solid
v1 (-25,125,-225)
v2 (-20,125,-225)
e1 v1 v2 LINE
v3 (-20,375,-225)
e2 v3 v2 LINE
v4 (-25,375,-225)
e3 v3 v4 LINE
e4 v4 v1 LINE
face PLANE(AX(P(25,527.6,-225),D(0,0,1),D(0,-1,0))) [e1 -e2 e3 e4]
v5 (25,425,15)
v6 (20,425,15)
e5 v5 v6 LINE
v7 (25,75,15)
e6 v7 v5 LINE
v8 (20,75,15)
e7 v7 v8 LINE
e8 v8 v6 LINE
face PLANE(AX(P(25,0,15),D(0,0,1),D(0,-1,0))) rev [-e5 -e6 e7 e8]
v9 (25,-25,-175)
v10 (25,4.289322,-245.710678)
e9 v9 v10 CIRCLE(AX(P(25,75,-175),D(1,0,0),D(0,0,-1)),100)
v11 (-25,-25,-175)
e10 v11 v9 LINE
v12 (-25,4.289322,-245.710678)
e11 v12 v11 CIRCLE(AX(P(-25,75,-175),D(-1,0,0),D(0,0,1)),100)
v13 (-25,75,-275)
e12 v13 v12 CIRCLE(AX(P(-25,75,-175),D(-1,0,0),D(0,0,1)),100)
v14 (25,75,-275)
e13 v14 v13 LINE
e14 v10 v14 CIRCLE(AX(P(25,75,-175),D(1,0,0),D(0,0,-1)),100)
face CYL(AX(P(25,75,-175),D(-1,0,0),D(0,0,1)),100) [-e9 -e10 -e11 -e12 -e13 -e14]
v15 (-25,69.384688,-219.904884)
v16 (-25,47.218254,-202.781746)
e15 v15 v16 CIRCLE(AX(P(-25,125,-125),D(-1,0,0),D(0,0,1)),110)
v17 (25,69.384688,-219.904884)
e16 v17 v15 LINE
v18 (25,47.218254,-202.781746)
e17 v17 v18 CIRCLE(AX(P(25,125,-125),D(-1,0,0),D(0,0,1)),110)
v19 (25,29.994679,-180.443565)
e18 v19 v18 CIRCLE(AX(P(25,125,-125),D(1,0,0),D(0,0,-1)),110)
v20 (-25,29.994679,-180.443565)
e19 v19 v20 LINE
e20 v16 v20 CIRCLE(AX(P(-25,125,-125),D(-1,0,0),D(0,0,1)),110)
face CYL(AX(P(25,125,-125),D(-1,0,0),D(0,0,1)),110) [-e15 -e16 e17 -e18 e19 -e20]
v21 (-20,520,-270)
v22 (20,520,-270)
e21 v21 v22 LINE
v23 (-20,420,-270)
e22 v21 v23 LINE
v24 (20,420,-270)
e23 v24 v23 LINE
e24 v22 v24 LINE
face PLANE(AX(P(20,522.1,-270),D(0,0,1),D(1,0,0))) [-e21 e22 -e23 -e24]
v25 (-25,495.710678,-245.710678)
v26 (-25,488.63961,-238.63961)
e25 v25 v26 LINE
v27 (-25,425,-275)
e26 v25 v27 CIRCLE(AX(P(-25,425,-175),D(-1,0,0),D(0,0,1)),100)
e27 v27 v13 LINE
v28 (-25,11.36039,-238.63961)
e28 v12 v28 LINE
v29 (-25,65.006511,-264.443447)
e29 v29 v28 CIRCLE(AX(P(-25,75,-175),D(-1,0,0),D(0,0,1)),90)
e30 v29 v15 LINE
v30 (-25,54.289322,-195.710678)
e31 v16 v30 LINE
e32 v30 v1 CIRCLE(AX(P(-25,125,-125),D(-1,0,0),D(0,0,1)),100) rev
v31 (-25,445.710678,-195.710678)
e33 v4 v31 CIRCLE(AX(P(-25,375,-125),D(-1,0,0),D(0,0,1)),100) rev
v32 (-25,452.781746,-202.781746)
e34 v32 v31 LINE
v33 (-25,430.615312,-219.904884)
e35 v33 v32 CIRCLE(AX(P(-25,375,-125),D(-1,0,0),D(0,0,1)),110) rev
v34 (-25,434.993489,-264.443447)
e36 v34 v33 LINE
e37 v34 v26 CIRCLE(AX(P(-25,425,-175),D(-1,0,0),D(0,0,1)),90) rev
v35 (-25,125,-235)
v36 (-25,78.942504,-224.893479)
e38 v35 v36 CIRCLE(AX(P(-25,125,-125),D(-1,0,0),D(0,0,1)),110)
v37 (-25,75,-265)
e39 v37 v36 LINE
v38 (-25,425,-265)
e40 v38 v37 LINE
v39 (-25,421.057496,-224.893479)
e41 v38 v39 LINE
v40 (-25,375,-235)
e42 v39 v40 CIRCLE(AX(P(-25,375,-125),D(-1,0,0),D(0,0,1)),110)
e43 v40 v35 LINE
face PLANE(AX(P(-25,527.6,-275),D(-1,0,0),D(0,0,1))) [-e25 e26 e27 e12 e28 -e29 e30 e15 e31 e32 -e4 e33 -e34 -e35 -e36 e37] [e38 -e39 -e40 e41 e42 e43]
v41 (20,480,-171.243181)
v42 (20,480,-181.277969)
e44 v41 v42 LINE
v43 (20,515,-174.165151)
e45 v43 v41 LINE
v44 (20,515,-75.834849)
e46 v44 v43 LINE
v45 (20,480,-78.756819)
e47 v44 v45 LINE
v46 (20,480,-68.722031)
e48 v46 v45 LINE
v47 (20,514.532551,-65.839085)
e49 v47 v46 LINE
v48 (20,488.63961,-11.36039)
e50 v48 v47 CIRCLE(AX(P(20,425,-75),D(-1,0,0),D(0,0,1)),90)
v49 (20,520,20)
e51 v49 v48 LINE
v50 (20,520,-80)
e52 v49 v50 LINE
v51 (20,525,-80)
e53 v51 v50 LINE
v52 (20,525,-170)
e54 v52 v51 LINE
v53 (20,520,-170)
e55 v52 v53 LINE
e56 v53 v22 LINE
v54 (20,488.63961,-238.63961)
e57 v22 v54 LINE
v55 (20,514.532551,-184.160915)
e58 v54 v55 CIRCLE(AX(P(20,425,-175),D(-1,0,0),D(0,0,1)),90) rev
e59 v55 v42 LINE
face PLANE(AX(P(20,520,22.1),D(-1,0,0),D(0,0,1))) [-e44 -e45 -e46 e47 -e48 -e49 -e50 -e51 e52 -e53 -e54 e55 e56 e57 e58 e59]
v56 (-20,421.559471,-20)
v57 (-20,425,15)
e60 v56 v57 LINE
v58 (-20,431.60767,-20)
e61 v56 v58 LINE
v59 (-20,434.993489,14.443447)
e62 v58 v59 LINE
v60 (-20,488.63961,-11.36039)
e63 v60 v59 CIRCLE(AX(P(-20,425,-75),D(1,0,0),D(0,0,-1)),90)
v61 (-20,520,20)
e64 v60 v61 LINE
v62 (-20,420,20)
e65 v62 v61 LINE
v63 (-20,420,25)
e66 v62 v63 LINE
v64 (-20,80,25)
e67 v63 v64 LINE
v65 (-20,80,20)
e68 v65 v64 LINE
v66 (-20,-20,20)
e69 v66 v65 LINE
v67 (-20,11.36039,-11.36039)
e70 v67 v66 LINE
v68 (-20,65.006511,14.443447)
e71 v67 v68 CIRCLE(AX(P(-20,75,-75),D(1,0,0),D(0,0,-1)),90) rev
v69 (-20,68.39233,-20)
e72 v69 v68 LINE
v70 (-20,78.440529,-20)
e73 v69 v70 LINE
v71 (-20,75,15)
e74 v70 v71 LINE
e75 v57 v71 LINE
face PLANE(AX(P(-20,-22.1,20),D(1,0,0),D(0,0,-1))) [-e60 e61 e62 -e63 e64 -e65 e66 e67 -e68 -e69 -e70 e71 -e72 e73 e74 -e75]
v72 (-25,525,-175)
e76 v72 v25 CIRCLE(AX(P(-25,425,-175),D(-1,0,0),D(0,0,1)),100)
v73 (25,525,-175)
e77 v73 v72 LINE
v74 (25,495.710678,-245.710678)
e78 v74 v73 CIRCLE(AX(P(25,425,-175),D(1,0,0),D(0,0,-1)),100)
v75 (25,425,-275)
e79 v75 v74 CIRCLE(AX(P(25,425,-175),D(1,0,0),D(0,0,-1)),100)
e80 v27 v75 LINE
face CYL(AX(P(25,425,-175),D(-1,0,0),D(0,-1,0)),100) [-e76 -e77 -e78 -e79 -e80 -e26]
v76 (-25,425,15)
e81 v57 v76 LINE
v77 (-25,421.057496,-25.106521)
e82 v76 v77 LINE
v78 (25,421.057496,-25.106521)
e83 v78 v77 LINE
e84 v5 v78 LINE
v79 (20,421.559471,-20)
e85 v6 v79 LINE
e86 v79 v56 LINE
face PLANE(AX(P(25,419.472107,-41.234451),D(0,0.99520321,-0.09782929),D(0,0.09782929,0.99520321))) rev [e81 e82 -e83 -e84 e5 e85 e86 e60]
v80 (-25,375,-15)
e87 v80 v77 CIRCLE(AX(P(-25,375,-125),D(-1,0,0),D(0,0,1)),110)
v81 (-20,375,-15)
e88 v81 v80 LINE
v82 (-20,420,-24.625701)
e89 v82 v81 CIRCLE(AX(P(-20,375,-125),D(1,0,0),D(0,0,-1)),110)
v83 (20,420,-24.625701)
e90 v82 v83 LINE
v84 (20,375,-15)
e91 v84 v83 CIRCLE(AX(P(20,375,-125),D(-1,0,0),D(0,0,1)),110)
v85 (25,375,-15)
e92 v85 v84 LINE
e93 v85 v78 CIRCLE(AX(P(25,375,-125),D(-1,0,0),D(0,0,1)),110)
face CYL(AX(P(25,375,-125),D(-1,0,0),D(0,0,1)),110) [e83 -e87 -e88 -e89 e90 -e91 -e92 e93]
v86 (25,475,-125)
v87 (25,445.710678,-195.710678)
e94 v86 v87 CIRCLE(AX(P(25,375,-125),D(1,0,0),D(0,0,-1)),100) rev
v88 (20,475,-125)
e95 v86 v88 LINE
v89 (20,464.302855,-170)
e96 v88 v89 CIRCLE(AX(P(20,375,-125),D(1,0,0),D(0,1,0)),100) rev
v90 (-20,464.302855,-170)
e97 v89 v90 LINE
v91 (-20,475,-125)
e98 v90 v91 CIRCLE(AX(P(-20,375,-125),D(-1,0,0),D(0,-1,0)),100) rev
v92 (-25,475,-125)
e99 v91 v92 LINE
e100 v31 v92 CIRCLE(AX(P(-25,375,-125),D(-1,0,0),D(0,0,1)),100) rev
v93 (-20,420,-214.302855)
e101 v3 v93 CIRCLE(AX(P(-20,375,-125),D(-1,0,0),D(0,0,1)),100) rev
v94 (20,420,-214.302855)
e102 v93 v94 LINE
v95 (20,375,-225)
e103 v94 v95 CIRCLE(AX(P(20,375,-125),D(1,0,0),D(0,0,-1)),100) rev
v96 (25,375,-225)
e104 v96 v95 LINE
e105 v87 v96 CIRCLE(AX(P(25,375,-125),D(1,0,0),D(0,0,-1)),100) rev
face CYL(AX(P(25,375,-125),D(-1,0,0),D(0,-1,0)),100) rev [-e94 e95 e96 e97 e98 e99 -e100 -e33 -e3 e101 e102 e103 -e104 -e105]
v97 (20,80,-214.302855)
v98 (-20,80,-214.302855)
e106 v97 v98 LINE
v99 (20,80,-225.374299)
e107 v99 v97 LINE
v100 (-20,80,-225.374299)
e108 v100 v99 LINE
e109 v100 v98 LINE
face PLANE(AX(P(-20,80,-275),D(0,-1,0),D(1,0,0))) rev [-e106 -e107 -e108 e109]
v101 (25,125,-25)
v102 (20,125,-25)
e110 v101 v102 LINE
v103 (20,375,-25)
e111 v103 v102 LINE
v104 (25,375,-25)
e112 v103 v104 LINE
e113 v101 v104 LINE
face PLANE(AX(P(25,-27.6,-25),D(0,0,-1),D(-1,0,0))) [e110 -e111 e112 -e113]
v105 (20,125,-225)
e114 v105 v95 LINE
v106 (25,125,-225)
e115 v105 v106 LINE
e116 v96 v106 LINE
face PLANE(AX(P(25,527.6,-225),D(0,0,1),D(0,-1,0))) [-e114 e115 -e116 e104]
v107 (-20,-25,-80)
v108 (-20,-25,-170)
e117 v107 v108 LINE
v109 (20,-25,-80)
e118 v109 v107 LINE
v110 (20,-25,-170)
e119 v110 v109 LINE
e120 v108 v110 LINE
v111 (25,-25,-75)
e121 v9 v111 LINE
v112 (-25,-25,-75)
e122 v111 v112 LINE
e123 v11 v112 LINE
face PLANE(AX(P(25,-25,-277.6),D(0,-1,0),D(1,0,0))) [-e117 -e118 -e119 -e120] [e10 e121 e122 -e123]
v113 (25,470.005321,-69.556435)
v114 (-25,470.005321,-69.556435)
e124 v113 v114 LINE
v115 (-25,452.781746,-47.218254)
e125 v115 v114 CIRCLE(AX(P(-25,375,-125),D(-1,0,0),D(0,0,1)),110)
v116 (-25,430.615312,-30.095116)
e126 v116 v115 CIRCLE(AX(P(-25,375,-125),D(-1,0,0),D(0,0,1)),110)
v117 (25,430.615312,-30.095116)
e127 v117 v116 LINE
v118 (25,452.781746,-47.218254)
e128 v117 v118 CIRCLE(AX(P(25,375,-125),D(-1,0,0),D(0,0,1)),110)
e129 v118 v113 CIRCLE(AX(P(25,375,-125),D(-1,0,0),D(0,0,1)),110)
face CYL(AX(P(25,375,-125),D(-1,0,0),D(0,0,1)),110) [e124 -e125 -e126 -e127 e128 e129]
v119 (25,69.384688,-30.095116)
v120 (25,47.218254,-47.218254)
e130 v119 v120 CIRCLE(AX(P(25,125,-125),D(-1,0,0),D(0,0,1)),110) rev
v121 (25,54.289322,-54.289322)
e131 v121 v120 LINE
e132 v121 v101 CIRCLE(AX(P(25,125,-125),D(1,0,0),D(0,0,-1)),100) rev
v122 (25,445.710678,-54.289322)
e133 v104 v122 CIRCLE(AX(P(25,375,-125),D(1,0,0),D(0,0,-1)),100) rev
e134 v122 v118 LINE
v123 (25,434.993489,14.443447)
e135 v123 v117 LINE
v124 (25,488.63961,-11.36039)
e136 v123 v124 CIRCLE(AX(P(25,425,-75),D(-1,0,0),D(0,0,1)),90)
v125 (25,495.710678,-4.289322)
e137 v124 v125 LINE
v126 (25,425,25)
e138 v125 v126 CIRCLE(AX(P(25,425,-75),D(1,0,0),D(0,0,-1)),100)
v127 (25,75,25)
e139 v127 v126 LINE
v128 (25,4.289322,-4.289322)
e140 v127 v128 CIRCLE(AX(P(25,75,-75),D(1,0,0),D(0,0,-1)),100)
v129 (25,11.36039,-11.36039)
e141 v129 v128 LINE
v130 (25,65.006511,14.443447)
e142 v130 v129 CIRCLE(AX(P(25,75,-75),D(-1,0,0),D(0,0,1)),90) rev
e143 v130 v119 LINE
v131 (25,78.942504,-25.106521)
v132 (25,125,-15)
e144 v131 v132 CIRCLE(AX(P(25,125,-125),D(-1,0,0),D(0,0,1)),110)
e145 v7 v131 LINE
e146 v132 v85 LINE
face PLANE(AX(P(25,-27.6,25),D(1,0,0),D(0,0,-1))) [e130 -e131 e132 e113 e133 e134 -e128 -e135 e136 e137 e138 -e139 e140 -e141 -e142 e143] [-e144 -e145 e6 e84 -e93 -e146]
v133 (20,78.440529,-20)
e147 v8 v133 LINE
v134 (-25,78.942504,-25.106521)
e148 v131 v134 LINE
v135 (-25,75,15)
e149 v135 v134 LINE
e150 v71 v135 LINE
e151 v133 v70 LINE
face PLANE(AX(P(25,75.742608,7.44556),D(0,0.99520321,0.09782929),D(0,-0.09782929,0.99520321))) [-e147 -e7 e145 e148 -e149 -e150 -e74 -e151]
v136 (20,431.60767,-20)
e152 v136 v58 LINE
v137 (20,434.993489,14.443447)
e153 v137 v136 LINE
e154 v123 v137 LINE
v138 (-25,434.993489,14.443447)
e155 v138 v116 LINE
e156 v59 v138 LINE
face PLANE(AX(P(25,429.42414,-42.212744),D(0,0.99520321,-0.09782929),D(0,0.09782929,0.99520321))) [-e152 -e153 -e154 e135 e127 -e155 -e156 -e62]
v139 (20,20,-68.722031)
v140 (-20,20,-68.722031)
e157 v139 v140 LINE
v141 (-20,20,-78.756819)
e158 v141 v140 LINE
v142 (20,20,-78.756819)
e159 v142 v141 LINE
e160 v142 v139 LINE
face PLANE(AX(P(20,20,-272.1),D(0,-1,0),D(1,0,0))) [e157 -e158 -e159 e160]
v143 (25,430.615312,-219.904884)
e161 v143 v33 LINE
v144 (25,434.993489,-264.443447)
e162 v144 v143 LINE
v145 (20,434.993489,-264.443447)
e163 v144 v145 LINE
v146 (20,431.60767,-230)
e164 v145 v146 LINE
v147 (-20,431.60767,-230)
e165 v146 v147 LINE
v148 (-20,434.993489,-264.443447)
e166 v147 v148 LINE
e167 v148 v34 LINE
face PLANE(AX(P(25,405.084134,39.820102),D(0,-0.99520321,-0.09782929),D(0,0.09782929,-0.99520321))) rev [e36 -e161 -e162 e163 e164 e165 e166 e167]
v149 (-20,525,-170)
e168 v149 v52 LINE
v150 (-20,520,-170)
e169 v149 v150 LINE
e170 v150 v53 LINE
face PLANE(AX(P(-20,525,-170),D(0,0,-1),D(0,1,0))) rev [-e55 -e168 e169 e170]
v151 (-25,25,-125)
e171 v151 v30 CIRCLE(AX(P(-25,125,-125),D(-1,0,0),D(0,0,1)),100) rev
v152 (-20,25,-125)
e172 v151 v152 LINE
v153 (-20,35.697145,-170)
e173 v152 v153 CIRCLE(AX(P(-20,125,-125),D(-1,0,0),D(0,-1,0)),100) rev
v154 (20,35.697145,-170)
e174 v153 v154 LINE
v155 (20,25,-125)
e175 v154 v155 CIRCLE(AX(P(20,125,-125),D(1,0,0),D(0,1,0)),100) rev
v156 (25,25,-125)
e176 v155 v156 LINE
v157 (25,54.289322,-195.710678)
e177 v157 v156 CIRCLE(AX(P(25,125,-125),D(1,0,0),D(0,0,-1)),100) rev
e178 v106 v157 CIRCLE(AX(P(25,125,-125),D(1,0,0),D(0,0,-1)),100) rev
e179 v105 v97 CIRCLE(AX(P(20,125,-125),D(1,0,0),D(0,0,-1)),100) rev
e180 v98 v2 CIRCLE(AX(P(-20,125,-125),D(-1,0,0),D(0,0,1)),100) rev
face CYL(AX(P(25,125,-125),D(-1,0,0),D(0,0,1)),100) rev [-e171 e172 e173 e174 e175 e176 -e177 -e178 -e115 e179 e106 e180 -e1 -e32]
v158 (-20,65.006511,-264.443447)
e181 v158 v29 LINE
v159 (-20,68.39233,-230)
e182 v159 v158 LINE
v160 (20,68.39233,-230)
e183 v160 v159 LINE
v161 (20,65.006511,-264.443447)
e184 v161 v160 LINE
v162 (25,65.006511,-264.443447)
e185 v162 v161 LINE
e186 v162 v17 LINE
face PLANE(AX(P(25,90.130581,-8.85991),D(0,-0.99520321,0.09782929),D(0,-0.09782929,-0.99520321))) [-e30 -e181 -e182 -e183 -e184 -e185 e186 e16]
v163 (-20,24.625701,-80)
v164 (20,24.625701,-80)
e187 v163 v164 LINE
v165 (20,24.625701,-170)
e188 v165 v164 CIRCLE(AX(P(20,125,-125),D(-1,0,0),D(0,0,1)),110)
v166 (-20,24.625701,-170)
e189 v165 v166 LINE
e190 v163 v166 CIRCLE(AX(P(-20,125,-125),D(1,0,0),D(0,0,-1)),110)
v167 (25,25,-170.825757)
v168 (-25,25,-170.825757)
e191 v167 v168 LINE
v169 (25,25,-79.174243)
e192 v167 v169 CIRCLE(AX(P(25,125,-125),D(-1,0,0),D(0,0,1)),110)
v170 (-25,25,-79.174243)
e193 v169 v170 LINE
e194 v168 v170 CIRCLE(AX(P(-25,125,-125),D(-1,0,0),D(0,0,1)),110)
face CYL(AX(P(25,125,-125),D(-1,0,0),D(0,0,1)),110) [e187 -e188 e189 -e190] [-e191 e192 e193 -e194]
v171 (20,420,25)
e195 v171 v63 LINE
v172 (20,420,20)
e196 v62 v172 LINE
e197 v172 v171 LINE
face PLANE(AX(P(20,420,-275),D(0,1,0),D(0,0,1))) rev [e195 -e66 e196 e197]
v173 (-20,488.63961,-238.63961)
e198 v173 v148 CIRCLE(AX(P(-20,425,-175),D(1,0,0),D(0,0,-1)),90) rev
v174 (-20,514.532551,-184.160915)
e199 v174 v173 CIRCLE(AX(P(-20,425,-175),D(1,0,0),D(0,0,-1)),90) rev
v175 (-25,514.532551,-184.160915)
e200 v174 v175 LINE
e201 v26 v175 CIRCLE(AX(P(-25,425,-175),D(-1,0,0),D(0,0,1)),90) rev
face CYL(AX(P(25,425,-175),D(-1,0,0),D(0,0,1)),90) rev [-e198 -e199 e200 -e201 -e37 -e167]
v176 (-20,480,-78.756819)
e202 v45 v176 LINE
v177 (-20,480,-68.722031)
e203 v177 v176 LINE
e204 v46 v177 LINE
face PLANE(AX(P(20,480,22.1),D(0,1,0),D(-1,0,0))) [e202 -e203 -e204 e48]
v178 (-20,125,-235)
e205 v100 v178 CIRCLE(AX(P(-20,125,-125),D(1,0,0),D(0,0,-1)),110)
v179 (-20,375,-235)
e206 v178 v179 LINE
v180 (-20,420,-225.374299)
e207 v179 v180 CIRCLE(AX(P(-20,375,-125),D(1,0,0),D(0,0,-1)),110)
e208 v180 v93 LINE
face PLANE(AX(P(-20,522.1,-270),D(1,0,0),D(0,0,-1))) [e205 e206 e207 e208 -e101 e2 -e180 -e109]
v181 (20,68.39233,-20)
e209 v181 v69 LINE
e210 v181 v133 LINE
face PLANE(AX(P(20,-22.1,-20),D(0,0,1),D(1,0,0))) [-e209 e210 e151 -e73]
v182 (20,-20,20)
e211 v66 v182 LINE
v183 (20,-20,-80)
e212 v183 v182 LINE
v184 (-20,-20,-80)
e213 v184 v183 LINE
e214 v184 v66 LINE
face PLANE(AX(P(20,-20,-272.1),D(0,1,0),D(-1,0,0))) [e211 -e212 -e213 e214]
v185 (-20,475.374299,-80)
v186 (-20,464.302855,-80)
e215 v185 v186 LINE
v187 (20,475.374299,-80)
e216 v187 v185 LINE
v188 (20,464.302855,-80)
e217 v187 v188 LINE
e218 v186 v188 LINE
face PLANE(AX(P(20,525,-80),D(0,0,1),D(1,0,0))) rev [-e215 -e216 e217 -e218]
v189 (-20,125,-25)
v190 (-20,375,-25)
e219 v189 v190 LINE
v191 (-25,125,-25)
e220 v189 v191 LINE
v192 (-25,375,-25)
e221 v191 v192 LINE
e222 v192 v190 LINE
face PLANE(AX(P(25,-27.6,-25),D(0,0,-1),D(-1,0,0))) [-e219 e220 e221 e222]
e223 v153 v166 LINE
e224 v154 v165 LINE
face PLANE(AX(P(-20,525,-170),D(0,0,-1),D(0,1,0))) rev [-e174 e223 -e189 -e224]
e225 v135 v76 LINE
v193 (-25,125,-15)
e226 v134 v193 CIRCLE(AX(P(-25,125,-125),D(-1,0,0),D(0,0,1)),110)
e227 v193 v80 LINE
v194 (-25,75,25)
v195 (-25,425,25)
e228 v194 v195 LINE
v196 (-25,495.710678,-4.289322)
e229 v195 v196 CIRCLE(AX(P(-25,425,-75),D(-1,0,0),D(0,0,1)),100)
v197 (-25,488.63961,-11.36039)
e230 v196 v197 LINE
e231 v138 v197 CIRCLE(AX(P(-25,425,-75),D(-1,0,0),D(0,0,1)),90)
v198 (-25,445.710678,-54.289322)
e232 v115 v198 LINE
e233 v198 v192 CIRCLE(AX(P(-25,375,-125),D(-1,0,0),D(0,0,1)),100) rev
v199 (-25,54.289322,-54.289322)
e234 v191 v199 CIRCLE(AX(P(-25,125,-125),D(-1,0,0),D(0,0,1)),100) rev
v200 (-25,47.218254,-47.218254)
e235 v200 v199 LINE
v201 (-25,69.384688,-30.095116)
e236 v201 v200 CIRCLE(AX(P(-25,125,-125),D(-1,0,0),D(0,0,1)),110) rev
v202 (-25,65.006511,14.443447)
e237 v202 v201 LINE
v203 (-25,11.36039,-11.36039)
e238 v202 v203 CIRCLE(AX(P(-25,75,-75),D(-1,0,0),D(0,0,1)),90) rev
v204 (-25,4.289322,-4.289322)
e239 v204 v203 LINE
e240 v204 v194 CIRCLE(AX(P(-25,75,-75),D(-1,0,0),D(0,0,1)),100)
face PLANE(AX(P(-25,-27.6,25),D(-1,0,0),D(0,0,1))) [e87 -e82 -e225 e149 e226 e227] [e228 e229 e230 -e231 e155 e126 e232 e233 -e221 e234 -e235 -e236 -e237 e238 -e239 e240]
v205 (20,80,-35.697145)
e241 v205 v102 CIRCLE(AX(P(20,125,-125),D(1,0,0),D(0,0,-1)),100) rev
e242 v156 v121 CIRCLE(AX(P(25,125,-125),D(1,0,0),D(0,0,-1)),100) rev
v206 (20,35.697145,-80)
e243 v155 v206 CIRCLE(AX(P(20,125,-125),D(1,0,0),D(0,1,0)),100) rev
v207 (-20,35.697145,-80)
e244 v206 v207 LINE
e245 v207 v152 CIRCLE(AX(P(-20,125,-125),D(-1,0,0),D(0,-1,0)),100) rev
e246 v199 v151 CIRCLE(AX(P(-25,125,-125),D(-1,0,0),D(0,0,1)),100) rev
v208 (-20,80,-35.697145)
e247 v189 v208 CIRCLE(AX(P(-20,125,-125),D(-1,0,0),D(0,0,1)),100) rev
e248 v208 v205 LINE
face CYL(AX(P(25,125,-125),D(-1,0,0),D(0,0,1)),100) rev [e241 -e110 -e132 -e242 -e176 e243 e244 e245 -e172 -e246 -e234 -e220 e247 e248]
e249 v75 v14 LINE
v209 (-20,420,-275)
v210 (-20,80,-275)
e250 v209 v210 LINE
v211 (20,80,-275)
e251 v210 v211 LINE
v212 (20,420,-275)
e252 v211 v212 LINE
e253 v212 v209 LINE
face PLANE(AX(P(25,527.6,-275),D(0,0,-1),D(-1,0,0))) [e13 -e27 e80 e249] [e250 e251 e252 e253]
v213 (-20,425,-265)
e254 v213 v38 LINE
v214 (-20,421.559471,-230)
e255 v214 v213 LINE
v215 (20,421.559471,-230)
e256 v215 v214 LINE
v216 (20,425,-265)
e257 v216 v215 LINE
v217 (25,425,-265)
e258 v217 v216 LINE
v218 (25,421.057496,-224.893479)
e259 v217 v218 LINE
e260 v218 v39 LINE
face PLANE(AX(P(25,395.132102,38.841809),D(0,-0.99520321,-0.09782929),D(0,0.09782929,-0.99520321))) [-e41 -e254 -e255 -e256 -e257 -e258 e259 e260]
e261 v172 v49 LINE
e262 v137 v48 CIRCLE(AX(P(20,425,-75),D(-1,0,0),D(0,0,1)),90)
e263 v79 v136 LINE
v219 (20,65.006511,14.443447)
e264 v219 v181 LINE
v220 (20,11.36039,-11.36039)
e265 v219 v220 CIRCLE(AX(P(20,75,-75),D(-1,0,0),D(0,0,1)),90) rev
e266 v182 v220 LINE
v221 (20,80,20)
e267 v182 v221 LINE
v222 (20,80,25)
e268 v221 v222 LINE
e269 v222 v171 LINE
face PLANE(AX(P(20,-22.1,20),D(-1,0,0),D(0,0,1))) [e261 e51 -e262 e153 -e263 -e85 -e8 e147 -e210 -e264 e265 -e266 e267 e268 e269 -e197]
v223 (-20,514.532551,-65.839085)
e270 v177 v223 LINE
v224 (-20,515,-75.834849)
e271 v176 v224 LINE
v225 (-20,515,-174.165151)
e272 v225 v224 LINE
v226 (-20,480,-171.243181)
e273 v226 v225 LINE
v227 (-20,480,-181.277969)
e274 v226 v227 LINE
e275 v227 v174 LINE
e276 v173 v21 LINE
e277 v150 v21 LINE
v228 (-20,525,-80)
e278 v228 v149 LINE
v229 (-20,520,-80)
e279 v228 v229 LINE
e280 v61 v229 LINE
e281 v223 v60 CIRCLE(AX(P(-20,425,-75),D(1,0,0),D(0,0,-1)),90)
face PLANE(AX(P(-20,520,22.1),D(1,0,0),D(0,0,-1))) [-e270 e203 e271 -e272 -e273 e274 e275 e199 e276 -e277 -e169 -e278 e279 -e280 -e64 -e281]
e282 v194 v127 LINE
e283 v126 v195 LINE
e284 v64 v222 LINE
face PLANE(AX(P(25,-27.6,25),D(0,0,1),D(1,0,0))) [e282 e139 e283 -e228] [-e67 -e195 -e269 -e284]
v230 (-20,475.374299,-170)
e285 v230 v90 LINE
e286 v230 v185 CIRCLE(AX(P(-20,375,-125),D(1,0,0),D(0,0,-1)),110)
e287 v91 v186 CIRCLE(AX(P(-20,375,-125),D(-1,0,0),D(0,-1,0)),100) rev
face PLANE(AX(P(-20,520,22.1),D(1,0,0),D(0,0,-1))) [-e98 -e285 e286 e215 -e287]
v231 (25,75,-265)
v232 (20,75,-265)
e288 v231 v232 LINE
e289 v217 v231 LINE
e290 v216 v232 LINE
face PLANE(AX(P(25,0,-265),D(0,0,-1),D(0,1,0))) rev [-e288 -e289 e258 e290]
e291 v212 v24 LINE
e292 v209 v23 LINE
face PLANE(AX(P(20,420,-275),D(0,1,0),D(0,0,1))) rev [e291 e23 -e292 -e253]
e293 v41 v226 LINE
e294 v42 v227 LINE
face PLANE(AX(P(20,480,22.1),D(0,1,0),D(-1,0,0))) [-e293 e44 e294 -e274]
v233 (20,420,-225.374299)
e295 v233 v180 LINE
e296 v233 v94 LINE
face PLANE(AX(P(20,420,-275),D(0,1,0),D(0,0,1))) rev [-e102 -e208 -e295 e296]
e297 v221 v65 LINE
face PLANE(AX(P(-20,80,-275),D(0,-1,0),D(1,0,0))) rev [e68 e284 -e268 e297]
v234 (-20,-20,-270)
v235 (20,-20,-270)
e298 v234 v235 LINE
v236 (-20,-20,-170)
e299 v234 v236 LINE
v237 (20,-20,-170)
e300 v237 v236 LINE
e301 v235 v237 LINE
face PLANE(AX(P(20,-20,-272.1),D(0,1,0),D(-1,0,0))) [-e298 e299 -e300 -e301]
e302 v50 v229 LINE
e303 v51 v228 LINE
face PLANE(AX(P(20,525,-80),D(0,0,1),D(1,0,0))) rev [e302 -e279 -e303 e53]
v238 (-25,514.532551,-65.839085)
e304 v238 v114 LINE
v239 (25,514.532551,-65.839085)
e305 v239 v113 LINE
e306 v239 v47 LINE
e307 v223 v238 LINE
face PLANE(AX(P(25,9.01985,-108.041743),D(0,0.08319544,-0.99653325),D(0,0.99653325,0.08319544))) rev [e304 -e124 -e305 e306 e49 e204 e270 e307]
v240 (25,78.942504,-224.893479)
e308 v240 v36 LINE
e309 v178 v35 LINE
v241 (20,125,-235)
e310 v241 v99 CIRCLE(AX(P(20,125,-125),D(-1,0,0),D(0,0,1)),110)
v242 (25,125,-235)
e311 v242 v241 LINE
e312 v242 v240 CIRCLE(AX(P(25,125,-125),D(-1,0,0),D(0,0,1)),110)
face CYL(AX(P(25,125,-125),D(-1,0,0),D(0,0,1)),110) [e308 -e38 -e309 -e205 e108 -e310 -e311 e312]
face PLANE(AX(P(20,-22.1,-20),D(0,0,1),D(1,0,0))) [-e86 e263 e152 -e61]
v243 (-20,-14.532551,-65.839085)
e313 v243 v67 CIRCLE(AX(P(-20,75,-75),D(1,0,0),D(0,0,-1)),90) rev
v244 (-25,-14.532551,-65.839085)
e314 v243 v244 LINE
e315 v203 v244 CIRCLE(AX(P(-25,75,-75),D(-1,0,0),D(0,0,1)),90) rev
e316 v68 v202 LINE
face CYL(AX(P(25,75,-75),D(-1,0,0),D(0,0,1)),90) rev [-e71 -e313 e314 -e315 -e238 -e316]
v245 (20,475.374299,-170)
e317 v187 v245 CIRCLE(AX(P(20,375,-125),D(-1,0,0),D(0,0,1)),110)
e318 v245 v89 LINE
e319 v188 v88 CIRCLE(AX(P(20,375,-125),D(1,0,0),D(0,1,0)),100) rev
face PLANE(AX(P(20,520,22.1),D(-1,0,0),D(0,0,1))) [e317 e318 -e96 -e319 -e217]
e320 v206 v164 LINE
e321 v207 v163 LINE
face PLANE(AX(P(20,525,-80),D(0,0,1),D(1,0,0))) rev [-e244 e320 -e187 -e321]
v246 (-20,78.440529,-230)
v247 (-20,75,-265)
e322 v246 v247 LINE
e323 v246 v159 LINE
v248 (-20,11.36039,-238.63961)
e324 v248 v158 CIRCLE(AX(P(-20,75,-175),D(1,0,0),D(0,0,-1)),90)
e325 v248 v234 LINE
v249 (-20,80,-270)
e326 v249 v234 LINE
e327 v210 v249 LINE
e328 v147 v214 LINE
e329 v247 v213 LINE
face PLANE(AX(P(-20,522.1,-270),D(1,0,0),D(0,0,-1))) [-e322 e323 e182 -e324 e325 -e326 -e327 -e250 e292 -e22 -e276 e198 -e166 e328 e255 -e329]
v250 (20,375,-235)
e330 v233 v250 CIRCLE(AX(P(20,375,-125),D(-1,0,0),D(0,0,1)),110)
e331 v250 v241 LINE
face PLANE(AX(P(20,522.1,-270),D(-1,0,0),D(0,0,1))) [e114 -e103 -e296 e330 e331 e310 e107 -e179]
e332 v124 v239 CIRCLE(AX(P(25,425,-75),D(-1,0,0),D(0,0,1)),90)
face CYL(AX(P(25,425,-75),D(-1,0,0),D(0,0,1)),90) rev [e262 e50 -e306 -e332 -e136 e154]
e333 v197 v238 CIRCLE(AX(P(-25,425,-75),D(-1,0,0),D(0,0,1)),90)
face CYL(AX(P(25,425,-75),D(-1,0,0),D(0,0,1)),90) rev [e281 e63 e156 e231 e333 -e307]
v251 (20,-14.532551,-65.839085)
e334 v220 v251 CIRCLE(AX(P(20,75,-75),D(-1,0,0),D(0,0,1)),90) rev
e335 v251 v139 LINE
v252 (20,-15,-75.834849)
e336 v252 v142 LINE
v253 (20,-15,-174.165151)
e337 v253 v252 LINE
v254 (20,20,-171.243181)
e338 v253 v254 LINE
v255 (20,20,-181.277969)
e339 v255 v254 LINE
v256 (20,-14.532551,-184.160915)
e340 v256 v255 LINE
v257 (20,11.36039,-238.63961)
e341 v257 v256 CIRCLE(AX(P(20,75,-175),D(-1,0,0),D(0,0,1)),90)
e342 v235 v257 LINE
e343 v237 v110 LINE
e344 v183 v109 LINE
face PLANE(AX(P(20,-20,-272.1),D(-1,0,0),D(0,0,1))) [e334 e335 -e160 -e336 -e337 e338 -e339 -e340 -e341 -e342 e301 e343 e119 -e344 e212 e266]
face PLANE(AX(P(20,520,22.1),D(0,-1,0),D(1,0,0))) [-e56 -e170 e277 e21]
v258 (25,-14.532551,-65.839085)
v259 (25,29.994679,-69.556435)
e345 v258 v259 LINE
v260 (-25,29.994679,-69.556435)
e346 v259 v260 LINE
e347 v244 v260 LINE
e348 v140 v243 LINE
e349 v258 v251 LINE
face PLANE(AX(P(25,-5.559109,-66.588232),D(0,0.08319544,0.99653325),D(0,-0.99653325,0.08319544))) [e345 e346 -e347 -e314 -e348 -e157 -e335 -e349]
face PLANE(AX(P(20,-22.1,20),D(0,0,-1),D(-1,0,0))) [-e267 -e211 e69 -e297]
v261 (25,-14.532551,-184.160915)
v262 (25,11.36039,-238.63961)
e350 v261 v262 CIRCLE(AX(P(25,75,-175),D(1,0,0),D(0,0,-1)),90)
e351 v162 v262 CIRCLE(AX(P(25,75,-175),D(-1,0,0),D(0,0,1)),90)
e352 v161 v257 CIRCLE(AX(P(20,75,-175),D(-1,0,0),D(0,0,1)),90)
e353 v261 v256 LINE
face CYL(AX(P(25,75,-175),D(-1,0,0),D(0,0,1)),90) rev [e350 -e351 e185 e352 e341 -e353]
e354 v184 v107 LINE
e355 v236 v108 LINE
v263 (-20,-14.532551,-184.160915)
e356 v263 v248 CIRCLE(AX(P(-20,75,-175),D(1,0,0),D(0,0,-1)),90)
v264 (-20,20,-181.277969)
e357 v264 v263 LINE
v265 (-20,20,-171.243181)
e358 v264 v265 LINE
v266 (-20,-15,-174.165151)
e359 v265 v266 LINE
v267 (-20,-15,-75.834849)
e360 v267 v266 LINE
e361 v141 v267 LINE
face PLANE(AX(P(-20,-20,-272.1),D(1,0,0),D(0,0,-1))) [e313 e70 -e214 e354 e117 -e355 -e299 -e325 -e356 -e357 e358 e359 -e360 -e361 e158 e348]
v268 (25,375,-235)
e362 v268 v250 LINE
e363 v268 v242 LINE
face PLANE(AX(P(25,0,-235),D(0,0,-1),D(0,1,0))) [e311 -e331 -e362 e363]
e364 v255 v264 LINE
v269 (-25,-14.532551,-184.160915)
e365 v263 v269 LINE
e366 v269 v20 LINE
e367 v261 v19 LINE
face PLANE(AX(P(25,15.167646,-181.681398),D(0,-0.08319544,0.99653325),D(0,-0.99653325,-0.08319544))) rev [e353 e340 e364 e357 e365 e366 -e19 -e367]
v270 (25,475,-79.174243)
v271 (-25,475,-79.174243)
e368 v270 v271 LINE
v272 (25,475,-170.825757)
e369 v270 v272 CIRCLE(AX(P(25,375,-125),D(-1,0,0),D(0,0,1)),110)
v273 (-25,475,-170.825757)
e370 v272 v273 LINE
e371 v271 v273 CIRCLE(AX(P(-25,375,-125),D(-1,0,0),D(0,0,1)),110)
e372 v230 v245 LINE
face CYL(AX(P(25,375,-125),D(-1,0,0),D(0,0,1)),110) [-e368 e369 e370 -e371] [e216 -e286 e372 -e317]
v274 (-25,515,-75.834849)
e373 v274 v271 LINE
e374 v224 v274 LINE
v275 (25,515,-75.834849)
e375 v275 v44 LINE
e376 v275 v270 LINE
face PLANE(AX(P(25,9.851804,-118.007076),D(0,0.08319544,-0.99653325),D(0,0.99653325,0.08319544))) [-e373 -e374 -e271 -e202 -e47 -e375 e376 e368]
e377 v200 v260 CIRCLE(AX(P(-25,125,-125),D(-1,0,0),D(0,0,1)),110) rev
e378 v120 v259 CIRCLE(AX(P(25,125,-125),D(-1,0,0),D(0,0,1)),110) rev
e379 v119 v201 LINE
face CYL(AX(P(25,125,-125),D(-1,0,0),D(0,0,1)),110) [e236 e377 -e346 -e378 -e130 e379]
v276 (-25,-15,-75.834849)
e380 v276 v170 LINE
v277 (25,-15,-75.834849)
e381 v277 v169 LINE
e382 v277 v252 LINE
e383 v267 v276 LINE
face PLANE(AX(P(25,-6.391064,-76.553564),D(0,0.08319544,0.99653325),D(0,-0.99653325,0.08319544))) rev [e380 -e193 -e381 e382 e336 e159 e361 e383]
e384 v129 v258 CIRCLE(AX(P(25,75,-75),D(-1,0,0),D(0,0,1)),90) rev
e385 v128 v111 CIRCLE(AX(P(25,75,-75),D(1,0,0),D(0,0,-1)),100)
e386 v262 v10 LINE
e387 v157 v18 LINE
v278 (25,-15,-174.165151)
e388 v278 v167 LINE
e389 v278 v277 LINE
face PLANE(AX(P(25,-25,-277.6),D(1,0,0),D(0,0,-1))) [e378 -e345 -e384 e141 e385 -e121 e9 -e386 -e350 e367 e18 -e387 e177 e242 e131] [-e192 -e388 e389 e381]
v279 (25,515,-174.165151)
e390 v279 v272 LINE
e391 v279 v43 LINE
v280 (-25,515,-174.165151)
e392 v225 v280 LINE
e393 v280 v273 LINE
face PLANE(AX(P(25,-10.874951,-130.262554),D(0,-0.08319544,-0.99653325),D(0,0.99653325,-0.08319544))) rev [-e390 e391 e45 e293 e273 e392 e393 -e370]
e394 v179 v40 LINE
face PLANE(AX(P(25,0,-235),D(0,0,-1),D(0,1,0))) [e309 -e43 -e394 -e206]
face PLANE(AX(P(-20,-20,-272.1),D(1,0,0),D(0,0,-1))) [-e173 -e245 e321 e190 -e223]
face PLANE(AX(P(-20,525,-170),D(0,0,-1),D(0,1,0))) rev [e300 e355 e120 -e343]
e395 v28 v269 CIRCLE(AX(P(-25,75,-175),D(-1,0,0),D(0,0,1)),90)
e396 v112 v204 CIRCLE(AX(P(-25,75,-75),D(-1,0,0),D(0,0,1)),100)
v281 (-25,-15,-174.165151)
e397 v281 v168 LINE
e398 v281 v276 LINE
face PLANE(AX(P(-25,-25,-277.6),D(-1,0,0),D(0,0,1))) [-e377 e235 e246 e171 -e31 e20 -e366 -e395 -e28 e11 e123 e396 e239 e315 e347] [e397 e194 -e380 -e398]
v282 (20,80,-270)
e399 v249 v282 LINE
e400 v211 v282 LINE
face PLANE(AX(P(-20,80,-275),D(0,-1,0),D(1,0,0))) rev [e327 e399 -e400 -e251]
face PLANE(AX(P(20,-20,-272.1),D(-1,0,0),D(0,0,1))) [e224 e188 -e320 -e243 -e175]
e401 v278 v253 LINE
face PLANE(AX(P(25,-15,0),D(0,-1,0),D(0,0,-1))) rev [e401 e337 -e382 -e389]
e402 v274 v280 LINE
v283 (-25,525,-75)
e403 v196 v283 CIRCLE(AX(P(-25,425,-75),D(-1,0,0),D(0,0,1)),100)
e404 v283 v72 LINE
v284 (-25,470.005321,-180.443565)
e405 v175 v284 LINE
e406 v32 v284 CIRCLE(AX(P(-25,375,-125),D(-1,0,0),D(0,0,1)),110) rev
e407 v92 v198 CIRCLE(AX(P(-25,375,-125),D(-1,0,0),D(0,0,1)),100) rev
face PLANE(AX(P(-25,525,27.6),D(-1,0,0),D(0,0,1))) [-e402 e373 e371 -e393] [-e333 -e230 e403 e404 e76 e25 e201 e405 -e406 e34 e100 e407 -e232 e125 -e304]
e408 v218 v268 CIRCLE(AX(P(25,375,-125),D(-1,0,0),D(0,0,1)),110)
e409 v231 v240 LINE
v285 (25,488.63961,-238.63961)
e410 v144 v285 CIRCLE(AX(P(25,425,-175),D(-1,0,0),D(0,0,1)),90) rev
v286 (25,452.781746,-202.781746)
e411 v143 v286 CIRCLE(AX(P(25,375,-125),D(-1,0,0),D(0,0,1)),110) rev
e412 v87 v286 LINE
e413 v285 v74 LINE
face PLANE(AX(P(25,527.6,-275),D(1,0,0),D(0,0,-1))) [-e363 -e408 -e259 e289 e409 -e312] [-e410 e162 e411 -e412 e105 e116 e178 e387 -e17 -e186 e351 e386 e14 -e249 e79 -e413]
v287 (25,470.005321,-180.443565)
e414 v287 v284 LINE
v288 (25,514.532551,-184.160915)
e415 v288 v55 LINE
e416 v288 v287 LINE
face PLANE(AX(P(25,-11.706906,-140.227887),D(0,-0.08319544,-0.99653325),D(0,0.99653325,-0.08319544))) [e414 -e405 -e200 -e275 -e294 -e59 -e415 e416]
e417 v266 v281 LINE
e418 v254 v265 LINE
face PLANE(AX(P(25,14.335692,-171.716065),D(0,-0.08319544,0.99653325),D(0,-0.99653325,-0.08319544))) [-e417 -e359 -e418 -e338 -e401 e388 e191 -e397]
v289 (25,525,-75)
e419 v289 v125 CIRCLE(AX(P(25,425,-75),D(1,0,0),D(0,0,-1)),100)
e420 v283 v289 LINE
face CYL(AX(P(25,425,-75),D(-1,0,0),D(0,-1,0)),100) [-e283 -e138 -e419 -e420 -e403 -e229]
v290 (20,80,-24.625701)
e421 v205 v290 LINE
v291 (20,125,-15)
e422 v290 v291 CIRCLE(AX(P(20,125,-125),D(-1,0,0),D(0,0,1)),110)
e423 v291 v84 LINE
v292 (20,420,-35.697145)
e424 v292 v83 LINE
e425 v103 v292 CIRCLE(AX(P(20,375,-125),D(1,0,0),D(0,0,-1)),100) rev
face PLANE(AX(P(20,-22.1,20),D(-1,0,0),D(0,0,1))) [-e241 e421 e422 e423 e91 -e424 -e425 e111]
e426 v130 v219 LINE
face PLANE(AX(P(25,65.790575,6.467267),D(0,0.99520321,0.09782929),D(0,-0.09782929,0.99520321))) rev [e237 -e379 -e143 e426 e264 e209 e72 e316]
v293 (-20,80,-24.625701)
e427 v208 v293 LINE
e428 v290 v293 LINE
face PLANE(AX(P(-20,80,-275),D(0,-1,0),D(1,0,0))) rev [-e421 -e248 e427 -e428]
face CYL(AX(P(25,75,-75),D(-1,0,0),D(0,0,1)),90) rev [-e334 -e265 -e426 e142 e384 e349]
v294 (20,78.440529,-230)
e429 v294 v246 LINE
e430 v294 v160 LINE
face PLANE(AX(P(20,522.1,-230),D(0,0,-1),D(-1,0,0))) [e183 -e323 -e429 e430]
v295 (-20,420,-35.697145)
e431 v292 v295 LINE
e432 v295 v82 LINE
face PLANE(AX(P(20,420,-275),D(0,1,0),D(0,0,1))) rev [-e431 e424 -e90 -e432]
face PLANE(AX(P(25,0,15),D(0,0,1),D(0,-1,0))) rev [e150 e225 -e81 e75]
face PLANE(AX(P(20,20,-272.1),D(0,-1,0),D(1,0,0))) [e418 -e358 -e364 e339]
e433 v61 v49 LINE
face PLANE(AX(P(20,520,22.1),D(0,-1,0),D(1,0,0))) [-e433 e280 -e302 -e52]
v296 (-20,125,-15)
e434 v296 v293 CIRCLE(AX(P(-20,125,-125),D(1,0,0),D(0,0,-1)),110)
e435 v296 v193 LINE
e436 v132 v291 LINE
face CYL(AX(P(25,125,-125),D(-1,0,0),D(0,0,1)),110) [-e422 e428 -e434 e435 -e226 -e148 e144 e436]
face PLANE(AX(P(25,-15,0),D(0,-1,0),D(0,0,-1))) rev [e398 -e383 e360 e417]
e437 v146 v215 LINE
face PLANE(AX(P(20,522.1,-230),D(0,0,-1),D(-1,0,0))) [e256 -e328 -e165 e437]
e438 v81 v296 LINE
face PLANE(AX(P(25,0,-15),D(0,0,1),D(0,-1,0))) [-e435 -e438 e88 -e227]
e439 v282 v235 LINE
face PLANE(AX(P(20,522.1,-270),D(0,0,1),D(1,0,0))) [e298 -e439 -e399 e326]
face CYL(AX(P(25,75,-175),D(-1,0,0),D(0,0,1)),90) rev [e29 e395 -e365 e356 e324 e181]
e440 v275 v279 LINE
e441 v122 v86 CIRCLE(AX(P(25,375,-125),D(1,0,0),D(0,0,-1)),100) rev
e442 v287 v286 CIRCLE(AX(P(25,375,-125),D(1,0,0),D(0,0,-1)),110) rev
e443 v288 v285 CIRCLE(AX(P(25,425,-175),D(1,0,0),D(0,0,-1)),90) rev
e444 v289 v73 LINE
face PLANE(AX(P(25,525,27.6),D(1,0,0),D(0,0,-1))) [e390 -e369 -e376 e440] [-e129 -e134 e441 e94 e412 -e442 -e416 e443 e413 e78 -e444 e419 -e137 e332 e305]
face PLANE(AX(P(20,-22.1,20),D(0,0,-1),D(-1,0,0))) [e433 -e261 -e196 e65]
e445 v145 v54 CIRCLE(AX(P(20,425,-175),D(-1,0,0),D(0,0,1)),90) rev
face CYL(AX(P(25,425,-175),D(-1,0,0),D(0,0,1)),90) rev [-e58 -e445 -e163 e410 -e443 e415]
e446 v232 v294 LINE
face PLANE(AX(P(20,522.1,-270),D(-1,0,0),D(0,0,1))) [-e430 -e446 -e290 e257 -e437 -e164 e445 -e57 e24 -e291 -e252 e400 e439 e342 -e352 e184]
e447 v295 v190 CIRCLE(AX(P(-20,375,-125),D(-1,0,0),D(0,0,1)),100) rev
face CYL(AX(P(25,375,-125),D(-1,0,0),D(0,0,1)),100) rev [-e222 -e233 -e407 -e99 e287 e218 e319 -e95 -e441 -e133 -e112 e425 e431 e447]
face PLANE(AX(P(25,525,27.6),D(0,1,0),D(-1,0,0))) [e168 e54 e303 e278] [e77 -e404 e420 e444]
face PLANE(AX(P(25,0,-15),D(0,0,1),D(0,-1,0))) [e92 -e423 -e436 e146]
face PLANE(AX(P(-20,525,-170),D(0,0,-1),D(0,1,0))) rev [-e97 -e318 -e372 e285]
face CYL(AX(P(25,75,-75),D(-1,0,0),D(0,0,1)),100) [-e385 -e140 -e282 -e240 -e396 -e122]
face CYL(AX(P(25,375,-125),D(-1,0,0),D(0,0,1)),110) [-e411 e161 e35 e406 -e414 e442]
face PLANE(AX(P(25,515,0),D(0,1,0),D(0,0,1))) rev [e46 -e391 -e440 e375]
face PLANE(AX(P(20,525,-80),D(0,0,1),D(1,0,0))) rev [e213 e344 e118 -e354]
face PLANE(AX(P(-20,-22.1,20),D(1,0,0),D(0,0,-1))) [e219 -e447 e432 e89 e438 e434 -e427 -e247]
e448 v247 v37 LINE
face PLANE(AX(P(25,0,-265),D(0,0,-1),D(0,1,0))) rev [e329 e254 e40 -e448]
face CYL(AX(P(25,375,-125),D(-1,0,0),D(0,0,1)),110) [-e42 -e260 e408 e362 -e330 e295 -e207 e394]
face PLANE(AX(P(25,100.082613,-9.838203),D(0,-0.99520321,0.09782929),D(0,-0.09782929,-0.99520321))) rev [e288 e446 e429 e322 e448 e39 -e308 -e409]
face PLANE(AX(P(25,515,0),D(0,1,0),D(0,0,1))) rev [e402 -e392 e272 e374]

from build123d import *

# Parameters (mm, degrees)
FILLET3_R           = 100
CUT_EXTRUDE2_DEPTH  = 616.4266812545585
CUT_EXTRUDE3_DEPTH  = 606.1859218455102
CUT_EXTRUDE18_DEPTH = 595.7688626685159


with BuildPart() as part:
    # Sweep1: sweep along a path in Sketch3
    with BuildLine(Plane(origin=(0, 0, 0), x_dir=(0, 0, -1), z_dir=(1, 0, 0))) as sweep1_path:
        Line((0, 0), (0, 500))
        Line((0, 500), (250, 500))
        Line((250, 500), (250.00000000000006, 6.12e-15))
        Line((250.00000000000006, 6.12e-15), (0, 0))
    # Sketch2 → Sweep1 (sweep)
    with BuildSketch(Plane(origin=(0, 0, 0), x_dir=(1, 0, 0), z_dir=(0, 1, 0))):
        Polygon((25, -25), (-25, -25.00000000000001), (-25, 24.999999999999993), (25, 24.999999999999996), align=None)
        Polygon((20, 19.999999999999996), (-20, 19.99999999999999), (-20, -20.000000000000007), (20, -20), align=None, mode=Mode.SUBTRACT)
    sweep(path=sweep1_path.line, transition=Transition.RIGHT)

    # Fillet3
    fillet3_edges = [part.edges().sort_by_distance(p)[0] for p in [
        (0, 25, -225),
        (0, 25, -24.999999999999996),
        (0, 475, -225),
        (0, 475, -24.999999999999996),
    ]]
    fillet(fillet3_edges, radius=FILLET3_R - 0.0001)  # a hair under: the kernel refuses the full size
    fillet3_2_edges = [part.edges().sort_by_distance(p)[0] for p in [
        (-3.55e-15, 525, -275),
        (-3.55e-15, -25.000000000000004, -275),
        (-3.55e-15, -25.00000000000001, 25.000000000000007),
        (-3.55e-15, 525, 25.000000000000007),
    ]]
    fillet(fillet3_2_edges, radius=FILLET3_R)

    # Sketch5 → Cut-Extrude2 (cut, through all)
    with BuildSketch(Plane.XZ.offset(25.000000000000014)):
        Polygon((-20.000000000000007, -170.00000000000006), (19.999999999999993, -170.00000000000006), (19.999999999999993, -79.99999999999999), (-20.000000000000007, -79.99999999999996), align=None)
    extrude(amount=-CUT_EXTRUDE2_DEPTH, mode=Mode.SUBTRACT)

    # Sketch6 → Cut-Extrude3 (cut, through all)
    with BuildSketch(Plane.XY.offset(25.000000000000007)):
        Polygon((-20.000000000000007, 420.00000000000006), (-20.000000000000007, 79.99999999999997), (19.999999999999993, 79.99999999999999), (19.999999999999993, 420.00000000000006), align=None)
    extrude(amount=-CUT_EXTRUDE3_DEPTH, mode=Mode.SUBTRACT)

    # Sketch19 → Cut-Extrude18 (cut, through all)
    with BuildSketch(Plane.ZY.offset(25)):
        with BuildLine():
            ThreePointArc((-224.89347851891705, 421.05749612593655), (-232.44366579068512, 398.57665543412725), (-235.00000000000003, 375))
            Line((-235.00000000000003, 375), (-235.00000000000006, 125))
            ThreePointArc((-235.00000000000006, 125), (-232.44366579068517, 101.42334456587275), (-224.89347851891705, 78.94250387406343))
            Line((-224.89347851891705, 78.94250387406343), (-265.0000000000001, 74.99999999999996))
            Line((-265.0000000000001, 74.99999999999996), (-265, 425.00000000000006))
            Line((-265, 425.00000000000006), (-224.89347851891705, 421.05749612593655))
        make_face()
        with BuildLine():
            ThreePointArc((-238.63961030678925, 488.63961030678945), (-256.1053768922045, 464.0117653942177), (-264.44344676082267, 434.9934894578369))
            Line((-264.44344676082267, 434.9934894578369), (-219.90488415304466, 430.61531231501976))
            ThreePointArc((-219.90488415304463, 430.61531231501976), (-212.0517417816099, 442.2457749809452), (-202.7817459305202, 452.78174593052023))
            Line((-202.7817459305202, 452.78174593052023), (-238.63961030678934, 488.6396103067894))
        make_face()
        with BuildLine():
            ThreePointArc((-184.1609145540828, 514.532550754085), (-213.63405487722474, 506.2859754431452), (-238.63961030678925, 488.63961030678945))
            Line((-238.63961030678934, 488.6396103067894), (-202.7817459305202, 452.78174593052023))
            ThreePointArc((-202.78174593052017, 452.78174593052023), (-192.16702134643737, 462.1125205894492), (-180.4435650027513, 470.00532142877944))
            Line((-180.4435650027513, 470.00532142877944), (-184.1609145540828, 514.532550754085))
        make_face()
        with BuildLine():
            ThreePointArc((-79.17424305044158, 475), (-101.54792120088285, 482.4709263010234), (-125, 485))
            ThreePointArc((-125, 485), (-148.45207879911717, 482.4709263010234), (-170.82575694955844, 475))
            Line((-170.82575694955844, 475), (-174.16515138991173, 515))
            Line((-174.16515138991173, 515), (-75.83484861008839, 515))
            Line((-75.83484861008839, 515), (-79.17424305044158, 475))
        make_face()
        with BuildLine():
            Line((-47.21825406947977, 452.7817459305203), (-11.360389693210657, 488.6396103067894))
            ThreePointArc((-11.36038969321067, 488.6396103067894), (-36.365945122775244, 506.2859754431452), (-65.83908544591725, 514.532550754085))
            Line((-65.83908544591723, 514.532550754085), (-69.55643499724876, 470.00532142877944))
            ThreePointArc((-69.55643499724874, 470.00532142877944), (-57.83297865356265, 462.11252058944933), (-47.21825406947981, 452.78174593052034))
        make_face()
        with BuildLine():
            Line((-30.0951158469554, 430.61531231501976), (14.443446760822598, 434.9934894578369))
            ThreePointArc((14.443446760822624, 434.9934894578369), (6.105376892204447, 464.0117653942176), (-11.36038969321067, 488.6396103067894))
            Line((-11.360389693210657, 488.6396103067894), (-47.21825406947977, 452.7817459305203))
            ThreePointArc((-47.21825406947981, 452.78174593052034), (-37.94825821839011, 442.24577498094527), (-30.09511584695541, 430.61531231501976))
        make_face()
        with BuildLine():
            ThreePointArc((-25.106521481082943, 78.94250387406343), (-17.556334209314883, 101.42334456587272), (-15.000000000000027, 125))
            Line((-15.000000000000027, 125), (-14.999999999999995, 375))
            ThreePointArc((-14.999999999999995, 375), (-17.556334209314898, 398.57665543412725), (-25.106521481082943, 421.05749612593655))
            Line((-25.106521481082943, 421.05749612593655), (15.00000000000007, 425.00000000000006))
            Line((15.00000000000007, 425.00000000000006), (15.000000000000012, 74.99999999999997))
            Line((15.000000000000012, 74.99999999999997), (-25.106521481082943, 78.94250387406343))
        make_face()
        with BuildLine():
            Line((14.443446760822598, 65.00651054216311), (-30.0951158469554, 69.38468768498025))
            ThreePointArc((-30.0951158469554, 69.38468768498025), (-37.948258218390094, 57.754225019054786), (-47.2182540694798, 47.218254069479784))
            ThreePointArc((-47.2182540694798, 47.218254069479784), (-57.832978653562634, 37.887479410550725), (-69.55643499724876, 29.994678571220568))
            Line((-69.55643499724876, 29.994678571220568), (-65.83908544591723, -14.532550754084966))
            ThreePointArc((-65.83908544591723, -14.532550754084966), (-36.36594512277525, -6.285975443145162), (-11.360389693210696, 11.360389693210667))
            ThreePointArc((-11.360389693210696, 11.360389693210667), (6.105376892204447, 35.98823460578241), (14.443446760822598, 65.00651054216311))
        make_face()
        with BuildLine():
            ThreePointArc((-125.00000000000003, 15), (-101.54792120088285, 17.529073698976617), (-79.17424305044158, 25.00000000000002))
            Line((-79.17424305044158, 25.00000000000002), (-75.8348486100883, -15.00000000000004))
            Line((-75.8348486100883, -15.00000000000004), (-174.16515138991173, -15.000000000000016))
            Line((-174.16515138991173, -15.000000000000016), (-170.82575694955844, 25.00000000000002))
            ThreePointArc((-170.82575694955844, 25.00000000000002), (-148.45207879911717, 17.52907369897663), (-125.00000000000003, 15))
        make_face()
        with BuildLine():
            ThreePointArc((-264.44344676082267, 65.00651054216311), (-256.1053768922045, 35.9882346057824), (-238.63961030678936, 11.360389693210667))
            ThreePointArc((-238.63961030678936, 11.360389693210667), (-213.6340548772248, -6.285975443145162), (-184.1609145540828, -14.532550754084966))
            Line((-184.1609145540828, -14.532550754084966), (-180.4435650027513, 29.994678571220568))
            ThreePointArc((-180.4435650027513, 29.994678571220568), (-192.16702134643742, 37.88747941055071), (-202.7817459305203, 47.218254069479755))
            ThreePointArc((-202.7817459305203, 47.218254069479755), (-212.05174178160996, 57.754225019054815), (-219.90488415304466, 69.38468768498025))
            Line((-219.90488415304466, 69.38468768498025), (-264.44344676082267, 65.00651054216311))
        make_face()
    extrude(amount=-CUT_EXTRUDE18_DEPTH, mode=Mode.SUBTRACT)


solid = part.part
